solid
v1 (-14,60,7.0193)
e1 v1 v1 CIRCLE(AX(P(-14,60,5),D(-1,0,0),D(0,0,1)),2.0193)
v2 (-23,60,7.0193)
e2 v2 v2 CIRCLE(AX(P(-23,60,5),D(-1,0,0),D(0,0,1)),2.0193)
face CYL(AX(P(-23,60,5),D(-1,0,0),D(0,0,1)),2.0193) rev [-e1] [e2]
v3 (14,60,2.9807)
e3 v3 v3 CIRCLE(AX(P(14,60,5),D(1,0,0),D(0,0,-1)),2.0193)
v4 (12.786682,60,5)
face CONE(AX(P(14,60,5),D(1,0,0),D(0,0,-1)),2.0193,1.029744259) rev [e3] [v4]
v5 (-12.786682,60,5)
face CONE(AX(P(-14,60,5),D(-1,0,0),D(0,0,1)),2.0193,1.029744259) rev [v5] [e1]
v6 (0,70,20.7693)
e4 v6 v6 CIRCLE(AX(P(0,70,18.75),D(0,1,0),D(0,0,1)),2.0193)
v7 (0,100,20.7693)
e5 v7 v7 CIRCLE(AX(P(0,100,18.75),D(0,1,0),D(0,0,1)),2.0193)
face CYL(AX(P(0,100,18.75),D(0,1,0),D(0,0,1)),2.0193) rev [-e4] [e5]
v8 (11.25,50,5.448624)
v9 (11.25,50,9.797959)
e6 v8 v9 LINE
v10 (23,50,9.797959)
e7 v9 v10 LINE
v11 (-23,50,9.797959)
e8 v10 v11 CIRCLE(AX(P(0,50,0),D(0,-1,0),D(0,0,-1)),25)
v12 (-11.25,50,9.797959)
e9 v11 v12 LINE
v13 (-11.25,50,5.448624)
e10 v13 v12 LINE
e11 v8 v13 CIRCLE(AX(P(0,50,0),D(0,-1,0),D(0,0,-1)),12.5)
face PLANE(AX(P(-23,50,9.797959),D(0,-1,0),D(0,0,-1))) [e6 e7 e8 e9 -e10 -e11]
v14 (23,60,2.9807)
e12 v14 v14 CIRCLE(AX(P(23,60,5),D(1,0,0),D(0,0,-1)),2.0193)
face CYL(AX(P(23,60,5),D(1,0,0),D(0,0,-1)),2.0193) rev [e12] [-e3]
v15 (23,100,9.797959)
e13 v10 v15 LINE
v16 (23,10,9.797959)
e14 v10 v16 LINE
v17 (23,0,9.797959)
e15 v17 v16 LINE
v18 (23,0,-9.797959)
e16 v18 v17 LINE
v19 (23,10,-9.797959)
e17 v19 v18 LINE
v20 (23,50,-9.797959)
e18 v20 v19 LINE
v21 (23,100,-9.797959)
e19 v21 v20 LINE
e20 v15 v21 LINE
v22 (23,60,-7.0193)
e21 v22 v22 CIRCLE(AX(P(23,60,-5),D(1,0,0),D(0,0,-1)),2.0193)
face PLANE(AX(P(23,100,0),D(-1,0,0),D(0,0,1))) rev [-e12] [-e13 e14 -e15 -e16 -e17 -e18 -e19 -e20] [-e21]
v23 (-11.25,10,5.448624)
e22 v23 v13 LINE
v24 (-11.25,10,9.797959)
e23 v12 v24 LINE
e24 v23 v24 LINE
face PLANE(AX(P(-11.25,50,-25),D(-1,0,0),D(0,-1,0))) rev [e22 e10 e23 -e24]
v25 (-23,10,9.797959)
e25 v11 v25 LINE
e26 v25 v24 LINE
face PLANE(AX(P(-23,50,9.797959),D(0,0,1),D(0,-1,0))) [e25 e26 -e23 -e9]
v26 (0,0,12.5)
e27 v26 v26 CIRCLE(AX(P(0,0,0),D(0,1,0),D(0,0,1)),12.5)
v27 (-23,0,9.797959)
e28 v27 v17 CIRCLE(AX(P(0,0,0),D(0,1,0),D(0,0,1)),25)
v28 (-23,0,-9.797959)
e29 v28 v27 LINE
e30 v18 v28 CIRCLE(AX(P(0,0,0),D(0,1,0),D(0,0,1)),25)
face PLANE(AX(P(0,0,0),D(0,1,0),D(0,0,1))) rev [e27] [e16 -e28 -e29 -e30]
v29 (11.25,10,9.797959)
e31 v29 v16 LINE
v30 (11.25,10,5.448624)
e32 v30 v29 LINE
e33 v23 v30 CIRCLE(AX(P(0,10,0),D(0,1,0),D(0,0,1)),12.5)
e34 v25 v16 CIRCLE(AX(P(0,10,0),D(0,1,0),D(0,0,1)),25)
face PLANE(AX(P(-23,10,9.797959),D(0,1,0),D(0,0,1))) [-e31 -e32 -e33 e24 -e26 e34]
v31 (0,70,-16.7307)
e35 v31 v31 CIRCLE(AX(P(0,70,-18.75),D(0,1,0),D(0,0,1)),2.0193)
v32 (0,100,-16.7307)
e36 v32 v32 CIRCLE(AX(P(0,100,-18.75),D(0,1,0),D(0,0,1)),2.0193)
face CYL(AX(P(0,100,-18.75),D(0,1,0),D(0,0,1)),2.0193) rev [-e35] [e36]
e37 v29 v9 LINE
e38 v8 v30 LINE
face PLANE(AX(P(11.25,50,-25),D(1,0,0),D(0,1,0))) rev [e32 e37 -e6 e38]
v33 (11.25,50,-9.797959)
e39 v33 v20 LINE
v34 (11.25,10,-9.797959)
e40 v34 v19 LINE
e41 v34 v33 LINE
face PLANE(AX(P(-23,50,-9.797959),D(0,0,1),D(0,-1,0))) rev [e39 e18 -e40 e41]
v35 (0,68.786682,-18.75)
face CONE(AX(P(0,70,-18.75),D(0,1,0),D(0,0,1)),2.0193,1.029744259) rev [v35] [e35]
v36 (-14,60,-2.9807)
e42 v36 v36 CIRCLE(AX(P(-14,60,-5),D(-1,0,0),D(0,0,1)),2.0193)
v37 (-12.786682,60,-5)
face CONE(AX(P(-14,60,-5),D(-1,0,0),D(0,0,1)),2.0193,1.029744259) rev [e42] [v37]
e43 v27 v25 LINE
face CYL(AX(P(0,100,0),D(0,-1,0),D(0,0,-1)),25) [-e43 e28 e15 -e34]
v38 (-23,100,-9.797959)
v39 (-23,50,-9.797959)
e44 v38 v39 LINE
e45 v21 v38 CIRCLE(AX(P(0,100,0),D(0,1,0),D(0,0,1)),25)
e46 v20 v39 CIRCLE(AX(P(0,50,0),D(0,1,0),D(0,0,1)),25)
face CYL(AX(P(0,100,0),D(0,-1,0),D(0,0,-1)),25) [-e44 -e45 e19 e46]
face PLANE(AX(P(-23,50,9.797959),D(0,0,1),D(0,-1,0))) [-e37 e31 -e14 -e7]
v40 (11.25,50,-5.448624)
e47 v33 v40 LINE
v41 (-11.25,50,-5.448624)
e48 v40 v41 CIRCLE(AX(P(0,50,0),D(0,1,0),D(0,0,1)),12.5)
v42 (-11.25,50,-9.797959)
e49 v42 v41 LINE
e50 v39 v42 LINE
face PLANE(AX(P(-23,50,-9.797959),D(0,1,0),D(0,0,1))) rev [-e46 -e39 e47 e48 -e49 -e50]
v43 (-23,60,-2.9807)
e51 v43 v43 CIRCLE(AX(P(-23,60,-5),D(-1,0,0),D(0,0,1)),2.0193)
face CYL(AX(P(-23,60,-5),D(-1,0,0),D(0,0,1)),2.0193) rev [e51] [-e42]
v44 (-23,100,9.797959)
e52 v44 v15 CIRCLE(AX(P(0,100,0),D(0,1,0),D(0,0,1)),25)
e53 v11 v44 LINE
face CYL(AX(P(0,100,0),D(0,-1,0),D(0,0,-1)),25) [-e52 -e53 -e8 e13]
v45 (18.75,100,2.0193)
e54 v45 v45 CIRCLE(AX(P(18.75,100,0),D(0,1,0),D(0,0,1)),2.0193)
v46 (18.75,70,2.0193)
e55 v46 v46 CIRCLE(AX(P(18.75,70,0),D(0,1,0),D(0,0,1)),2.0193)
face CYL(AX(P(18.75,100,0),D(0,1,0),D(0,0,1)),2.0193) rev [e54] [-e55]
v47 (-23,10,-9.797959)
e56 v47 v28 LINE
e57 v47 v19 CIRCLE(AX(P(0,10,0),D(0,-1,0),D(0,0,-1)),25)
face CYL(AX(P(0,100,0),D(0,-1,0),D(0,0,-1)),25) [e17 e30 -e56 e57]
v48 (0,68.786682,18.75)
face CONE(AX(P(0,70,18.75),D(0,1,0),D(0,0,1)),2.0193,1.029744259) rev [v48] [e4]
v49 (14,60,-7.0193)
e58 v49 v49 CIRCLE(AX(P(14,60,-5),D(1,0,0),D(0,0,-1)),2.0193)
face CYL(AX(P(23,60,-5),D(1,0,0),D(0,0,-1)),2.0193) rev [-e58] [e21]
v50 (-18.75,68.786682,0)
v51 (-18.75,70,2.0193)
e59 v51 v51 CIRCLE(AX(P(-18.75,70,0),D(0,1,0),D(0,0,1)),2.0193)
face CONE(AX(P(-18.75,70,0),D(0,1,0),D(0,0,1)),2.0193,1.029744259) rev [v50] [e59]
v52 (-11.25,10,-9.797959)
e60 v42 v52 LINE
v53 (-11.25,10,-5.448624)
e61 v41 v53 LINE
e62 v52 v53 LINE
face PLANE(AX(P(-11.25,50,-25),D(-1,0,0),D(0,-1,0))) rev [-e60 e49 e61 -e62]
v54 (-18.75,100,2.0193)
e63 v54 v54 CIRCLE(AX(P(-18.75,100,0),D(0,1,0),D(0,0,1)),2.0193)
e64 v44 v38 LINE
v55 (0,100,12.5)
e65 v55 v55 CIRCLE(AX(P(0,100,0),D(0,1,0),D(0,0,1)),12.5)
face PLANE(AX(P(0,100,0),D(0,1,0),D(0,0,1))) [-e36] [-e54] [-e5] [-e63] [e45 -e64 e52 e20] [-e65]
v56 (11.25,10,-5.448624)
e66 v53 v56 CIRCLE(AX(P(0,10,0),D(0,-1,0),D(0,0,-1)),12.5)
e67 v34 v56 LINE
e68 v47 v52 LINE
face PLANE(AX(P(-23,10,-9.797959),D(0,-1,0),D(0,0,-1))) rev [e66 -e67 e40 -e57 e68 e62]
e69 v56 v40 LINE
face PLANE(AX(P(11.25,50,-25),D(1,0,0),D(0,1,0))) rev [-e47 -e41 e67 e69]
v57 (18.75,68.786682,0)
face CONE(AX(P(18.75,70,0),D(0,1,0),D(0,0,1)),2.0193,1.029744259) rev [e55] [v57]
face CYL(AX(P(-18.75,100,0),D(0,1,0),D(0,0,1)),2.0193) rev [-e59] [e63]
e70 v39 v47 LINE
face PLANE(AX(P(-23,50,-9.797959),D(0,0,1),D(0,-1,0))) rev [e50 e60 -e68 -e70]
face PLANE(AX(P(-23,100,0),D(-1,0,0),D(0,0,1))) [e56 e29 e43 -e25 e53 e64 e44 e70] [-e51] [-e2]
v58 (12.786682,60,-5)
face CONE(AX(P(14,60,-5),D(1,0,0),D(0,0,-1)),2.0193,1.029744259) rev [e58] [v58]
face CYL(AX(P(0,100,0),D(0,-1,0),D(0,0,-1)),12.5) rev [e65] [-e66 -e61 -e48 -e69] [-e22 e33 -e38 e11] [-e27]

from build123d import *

# Parameters (mm, degrees)
SKETCH1_R                            = 25
BOSS_EXTRUDE1_DEPTH                  = 100
SKETCH7_R                            = 12.5
THRU_HOLE_DEPTH                      = 107.066017178
SKETCH5_W                            = 5
SKETCH5_H                            = 25
MOUNT_FLATS_DEPTH                    = 107.066017178
F_10_32_TAPPED_HOLE3_D               = 4.0386
F_10_32_TAPPED_HOLE3_DEPTH           = 30
F_10_32_TAPPED_HOLE3_TIP             = 1.213317848
SKETCH6_W                            = 20
SKETCH6_H                            = 40
WINDOW_SLOT_1_DEPTH                  = 106.61249926
WINDOW_SLOT_2_DEPTH                  = 106.61249926
WINDOW_SLOT_2_DEPTH_BACK             = 106.61249926
SKETCH18_W                           = 22.5
SKETCH18_H                           = 40
F_10_32_TAPPED_HOLE2_D               = 4.0386
F_10_32_TAPPED_HOLE2_DEPTH           = 9
F_10_32_TAPPED_HOLE2_TIP             = 1.213317848
F_10_32_TAPPED_HOLE2_ON_FACE_2_D     = 4.0386
F_10_32_TAPPED_HOLE2_ON_FACE_2_DEPTH = 9
F_10_32_TAPPED_HOLE2_ON_FACE_2_TIP   = 1.213317848
SKETCH22_R                           = 2.5273
SKETCH22_R_2                         = 12.5
BOSS_EXTRUDE2_DEPTH                  = 6.35
SAVE_START                           = 100
SAVE_BODIES2_OUTLINE_R               = 2.5273
SAVE_BODIES2_OUTLINE_R_2             = 12.5
SAVE_BODIES2_DEPTH                   = 6.35


# Read off the part's stored shape, not the designer's step: Save Bodies2
with BuildPart() as part:
    # Sketch1 → Boss-Extrude1 (new body)
    with BuildSketch(Plane(origin=(0, 0, 0), x_dir=(1, 0, 0), z_dir=(0, 1, 0))):
        with Locations(Location((0, 0, 0), (0, 0, 270))):
            Circle(SKETCH1_R)
    extrude(amount=BOSS_EXTRUDE1_DEPTH)

    # Sketch7 → Thru Hole (cut, through all)
    with BuildSketch(Plane(origin=(0, 0, 0), x_dir=(1, 0, 0), z_dir=(0, 1, 0))):
        with Locations(Location((0, 0, 0), (0, 0, 270))):
            Circle(SKETCH7_R)
    extrude(amount=THRU_HOLE_DEPTH, mode=Mode.SUBTRACT)

    # Sketch5 → Mount Flats (cut, through all)
    with BuildSketch(Plane(origin=(0, 0, 0), x_dir=(1, 0, 0), z_dir=(0, 1, 0))):
        with Locations((-25.5, 0)):
            Rectangle(SKETCH5_W, SKETCH5_H)
        with Locations((25.5, 0)):
            Rectangle(SKETCH5_W, SKETCH5_H)
    extrude(amount=MOUNT_FLATS_DEPTH, mode=Mode.SUBTRACT)

    # #10-32 Tapped Hole3
    with Locations(Plane(origin=(0, 100, 0), x_dir=(1, 0, 0), z_dir=(0, 1, 0))):
        with Locations((0, 18.75), (-18.75, 0), (0, -18.75), (18.75, 0)):
            Hole(F_10_32_TAPPED_HOLE3_D / 2, depth=F_10_32_TAPPED_HOLE3_DEPTH)
            with Locations((0, 0, -(F_10_32_TAPPED_HOLE3_DEPTH + F_10_32_TAPPED_HOLE3_TIP / 2))):  # 118° drill point
                Cone(0, F_10_32_TAPPED_HOLE3_D / 2, F_10_32_TAPPED_HOLE3_TIP, mode=Mode.SUBTRACT)

    # Sketch6 → Window Slot 1 (cut, symmetric)
    with BuildSketch(Plane(origin=(0, 0, 0), x_dir=(0, 0, -1), z_dir=(1, 0, 0))):
        with Locations((19.797958971, 30)):
            Rectangle(SKETCH6_W, SKETCH6_H)
    window_slot_1 = extrude(amount=WINDOW_SLOT_1_DEPTH, both=True, mode=Mode.SUBTRACT)

    # Mirror2: Window Slot 1 across plane
    add(window_slot_1.mirror(Plane.XY), mode=Mode.SUBTRACT)

    # Sketch18 → Window Slot 2 (cut, two sides: drawn at the far end of the back side and taken through both)
    with BuildSketch(Plane.XY.offset(-WINDOW_SLOT_2_DEPTH_BACK)):
        with Locations((0, 30)):
            Rectangle(SKETCH18_W, SKETCH18_H)
    extrude(amount=WINDOW_SLOT_2_DEPTH + WINDOW_SLOT_2_DEPTH_BACK, mode=Mode.SUBTRACT)

    # #10-32 Tapped Hole2
    with Locations(Plane(origin=(-23, 60, 5), x_dir=(0, 0, -1), z_dir=(-1, 0, 0))):
        with Locations((0, 0), (10, 0)):
            Hole(F_10_32_TAPPED_HOLE2_D / 2, depth=F_10_32_TAPPED_HOLE2_DEPTH)
            with Locations((0, 0, -(F_10_32_TAPPED_HOLE2_DEPTH + F_10_32_TAPPED_HOLE2_TIP / 2))):  # 118° drill point
                Cone(0, F_10_32_TAPPED_HOLE2_D / 2, F_10_32_TAPPED_HOLE2_TIP, mode=Mode.SUBTRACT)

    # #10-32 Tapped Hole2 on face 2
    with Locations(Plane(origin=(23, 60, 5), x_dir=(0, 0, 1), z_dir=(1, 0, 0))):
        with Locations((0, 0), (-10, 0)):
            Hole(F_10_32_TAPPED_HOLE2_ON_FACE_2_D / 2, depth=F_10_32_TAPPED_HOLE2_ON_FACE_2_DEPTH)
            with Locations((0, 0, -(F_10_32_TAPPED_HOLE2_ON_FACE_2_DEPTH + F_10_32_TAPPED_HOLE2_ON_FACE_2_TIP / 2))):  # 118° drill point
                Cone(0, F_10_32_TAPPED_HOLE2_ON_FACE_2_D / 2, F_10_32_TAPPED_HOLE2_ON_FACE_2_TIP, mode=Mode.SUBTRACT)


with BuildPart() as body_2:
    # Sketch22 → Boss-Extrude2 (new body)
    with BuildSketch(Plane(origin=(0, 100, 0), x_dir=(1, 0, 0), z_dir=(0, 1, 0))):
        with BuildLine():
            Line((23, -9.797958971), (23, 9.797958971))
            ThreePointArc((23, 9.797958971), (0, 25), (-23, 9.797958971))
            Line((-23, 9.797958971), (-23, -9.797958971))
            ThreePointArc((-23, -9.797958971), (0, -25), (23, -9.797958971))
        make_face()
        with Locations(Location((-18.75, 0, 0), (0, 0, 270))):
            Circle(SKETCH22_R, mode=Mode.SUBTRACT)
        with Locations(Location((0, 18.75, 0), (0, 0, 270))):
            Circle(SKETCH22_R, mode=Mode.SUBTRACT)
        with Locations(Location((18.75, 0, 0), (0, 0, 270))):
            Circle(SKETCH22_R, mode=Mode.SUBTRACT)
        with Locations(Location((0, -18.75, 0), (0, 0, 270))):
            Circle(SKETCH22_R, mode=Mode.SUBTRACT)
        with Locations(Location((0, 0, 0), (0, 0, 270))):
            Circle(SKETCH22_R_2, mode=Mode.SUBTRACT)
    extrude(amount=BOSS_EXTRUDE2_DEPTH)

    # Save Bodies2 outline → Save Bodies2 (cut)
    with BuildSketch(Plane(origin=(0, 0, 0), x_dir=(1, 0, 0), z_dir=(0, 1, 0)).offset(SAVE_START)):
        with BuildLine():
            ThreePointArc((-23, -9.797958971), (0, -25), (23, -9.797958971))
            Line((23, -9.797958971), (23, 9.797958971))
            ThreePointArc((23, 9.797958971), (0, 25), (-23, 9.797958971))
            Line((-23, 9.797958971), (-23, -9.797958971))
        make_face()
        with Locations((0, -18.75)):
            Circle(SAVE_BODIES2_OUTLINE_R, mode=Mode.SUBTRACT)
        with Locations((-18.75, 0)):
            Circle(SAVE_BODIES2_OUTLINE_R, mode=Mode.SUBTRACT)
        Circle(SAVE_BODIES2_OUTLINE_R_2, mode=Mode.SUBTRACT)
        with Locations((18.75, 0)):
            Circle(SAVE_BODIES2_OUTLINE_R, mode=Mode.SUBTRACT)
        with Locations((0, 18.75)):
            Circle(SAVE_BODIES2_OUTLINE_R, mode=Mode.SUBTRACT)
    extrude(amount=SAVE_BODIES2_DEPTH, mode=Mode.SUBTRACT)


solid = part.part
